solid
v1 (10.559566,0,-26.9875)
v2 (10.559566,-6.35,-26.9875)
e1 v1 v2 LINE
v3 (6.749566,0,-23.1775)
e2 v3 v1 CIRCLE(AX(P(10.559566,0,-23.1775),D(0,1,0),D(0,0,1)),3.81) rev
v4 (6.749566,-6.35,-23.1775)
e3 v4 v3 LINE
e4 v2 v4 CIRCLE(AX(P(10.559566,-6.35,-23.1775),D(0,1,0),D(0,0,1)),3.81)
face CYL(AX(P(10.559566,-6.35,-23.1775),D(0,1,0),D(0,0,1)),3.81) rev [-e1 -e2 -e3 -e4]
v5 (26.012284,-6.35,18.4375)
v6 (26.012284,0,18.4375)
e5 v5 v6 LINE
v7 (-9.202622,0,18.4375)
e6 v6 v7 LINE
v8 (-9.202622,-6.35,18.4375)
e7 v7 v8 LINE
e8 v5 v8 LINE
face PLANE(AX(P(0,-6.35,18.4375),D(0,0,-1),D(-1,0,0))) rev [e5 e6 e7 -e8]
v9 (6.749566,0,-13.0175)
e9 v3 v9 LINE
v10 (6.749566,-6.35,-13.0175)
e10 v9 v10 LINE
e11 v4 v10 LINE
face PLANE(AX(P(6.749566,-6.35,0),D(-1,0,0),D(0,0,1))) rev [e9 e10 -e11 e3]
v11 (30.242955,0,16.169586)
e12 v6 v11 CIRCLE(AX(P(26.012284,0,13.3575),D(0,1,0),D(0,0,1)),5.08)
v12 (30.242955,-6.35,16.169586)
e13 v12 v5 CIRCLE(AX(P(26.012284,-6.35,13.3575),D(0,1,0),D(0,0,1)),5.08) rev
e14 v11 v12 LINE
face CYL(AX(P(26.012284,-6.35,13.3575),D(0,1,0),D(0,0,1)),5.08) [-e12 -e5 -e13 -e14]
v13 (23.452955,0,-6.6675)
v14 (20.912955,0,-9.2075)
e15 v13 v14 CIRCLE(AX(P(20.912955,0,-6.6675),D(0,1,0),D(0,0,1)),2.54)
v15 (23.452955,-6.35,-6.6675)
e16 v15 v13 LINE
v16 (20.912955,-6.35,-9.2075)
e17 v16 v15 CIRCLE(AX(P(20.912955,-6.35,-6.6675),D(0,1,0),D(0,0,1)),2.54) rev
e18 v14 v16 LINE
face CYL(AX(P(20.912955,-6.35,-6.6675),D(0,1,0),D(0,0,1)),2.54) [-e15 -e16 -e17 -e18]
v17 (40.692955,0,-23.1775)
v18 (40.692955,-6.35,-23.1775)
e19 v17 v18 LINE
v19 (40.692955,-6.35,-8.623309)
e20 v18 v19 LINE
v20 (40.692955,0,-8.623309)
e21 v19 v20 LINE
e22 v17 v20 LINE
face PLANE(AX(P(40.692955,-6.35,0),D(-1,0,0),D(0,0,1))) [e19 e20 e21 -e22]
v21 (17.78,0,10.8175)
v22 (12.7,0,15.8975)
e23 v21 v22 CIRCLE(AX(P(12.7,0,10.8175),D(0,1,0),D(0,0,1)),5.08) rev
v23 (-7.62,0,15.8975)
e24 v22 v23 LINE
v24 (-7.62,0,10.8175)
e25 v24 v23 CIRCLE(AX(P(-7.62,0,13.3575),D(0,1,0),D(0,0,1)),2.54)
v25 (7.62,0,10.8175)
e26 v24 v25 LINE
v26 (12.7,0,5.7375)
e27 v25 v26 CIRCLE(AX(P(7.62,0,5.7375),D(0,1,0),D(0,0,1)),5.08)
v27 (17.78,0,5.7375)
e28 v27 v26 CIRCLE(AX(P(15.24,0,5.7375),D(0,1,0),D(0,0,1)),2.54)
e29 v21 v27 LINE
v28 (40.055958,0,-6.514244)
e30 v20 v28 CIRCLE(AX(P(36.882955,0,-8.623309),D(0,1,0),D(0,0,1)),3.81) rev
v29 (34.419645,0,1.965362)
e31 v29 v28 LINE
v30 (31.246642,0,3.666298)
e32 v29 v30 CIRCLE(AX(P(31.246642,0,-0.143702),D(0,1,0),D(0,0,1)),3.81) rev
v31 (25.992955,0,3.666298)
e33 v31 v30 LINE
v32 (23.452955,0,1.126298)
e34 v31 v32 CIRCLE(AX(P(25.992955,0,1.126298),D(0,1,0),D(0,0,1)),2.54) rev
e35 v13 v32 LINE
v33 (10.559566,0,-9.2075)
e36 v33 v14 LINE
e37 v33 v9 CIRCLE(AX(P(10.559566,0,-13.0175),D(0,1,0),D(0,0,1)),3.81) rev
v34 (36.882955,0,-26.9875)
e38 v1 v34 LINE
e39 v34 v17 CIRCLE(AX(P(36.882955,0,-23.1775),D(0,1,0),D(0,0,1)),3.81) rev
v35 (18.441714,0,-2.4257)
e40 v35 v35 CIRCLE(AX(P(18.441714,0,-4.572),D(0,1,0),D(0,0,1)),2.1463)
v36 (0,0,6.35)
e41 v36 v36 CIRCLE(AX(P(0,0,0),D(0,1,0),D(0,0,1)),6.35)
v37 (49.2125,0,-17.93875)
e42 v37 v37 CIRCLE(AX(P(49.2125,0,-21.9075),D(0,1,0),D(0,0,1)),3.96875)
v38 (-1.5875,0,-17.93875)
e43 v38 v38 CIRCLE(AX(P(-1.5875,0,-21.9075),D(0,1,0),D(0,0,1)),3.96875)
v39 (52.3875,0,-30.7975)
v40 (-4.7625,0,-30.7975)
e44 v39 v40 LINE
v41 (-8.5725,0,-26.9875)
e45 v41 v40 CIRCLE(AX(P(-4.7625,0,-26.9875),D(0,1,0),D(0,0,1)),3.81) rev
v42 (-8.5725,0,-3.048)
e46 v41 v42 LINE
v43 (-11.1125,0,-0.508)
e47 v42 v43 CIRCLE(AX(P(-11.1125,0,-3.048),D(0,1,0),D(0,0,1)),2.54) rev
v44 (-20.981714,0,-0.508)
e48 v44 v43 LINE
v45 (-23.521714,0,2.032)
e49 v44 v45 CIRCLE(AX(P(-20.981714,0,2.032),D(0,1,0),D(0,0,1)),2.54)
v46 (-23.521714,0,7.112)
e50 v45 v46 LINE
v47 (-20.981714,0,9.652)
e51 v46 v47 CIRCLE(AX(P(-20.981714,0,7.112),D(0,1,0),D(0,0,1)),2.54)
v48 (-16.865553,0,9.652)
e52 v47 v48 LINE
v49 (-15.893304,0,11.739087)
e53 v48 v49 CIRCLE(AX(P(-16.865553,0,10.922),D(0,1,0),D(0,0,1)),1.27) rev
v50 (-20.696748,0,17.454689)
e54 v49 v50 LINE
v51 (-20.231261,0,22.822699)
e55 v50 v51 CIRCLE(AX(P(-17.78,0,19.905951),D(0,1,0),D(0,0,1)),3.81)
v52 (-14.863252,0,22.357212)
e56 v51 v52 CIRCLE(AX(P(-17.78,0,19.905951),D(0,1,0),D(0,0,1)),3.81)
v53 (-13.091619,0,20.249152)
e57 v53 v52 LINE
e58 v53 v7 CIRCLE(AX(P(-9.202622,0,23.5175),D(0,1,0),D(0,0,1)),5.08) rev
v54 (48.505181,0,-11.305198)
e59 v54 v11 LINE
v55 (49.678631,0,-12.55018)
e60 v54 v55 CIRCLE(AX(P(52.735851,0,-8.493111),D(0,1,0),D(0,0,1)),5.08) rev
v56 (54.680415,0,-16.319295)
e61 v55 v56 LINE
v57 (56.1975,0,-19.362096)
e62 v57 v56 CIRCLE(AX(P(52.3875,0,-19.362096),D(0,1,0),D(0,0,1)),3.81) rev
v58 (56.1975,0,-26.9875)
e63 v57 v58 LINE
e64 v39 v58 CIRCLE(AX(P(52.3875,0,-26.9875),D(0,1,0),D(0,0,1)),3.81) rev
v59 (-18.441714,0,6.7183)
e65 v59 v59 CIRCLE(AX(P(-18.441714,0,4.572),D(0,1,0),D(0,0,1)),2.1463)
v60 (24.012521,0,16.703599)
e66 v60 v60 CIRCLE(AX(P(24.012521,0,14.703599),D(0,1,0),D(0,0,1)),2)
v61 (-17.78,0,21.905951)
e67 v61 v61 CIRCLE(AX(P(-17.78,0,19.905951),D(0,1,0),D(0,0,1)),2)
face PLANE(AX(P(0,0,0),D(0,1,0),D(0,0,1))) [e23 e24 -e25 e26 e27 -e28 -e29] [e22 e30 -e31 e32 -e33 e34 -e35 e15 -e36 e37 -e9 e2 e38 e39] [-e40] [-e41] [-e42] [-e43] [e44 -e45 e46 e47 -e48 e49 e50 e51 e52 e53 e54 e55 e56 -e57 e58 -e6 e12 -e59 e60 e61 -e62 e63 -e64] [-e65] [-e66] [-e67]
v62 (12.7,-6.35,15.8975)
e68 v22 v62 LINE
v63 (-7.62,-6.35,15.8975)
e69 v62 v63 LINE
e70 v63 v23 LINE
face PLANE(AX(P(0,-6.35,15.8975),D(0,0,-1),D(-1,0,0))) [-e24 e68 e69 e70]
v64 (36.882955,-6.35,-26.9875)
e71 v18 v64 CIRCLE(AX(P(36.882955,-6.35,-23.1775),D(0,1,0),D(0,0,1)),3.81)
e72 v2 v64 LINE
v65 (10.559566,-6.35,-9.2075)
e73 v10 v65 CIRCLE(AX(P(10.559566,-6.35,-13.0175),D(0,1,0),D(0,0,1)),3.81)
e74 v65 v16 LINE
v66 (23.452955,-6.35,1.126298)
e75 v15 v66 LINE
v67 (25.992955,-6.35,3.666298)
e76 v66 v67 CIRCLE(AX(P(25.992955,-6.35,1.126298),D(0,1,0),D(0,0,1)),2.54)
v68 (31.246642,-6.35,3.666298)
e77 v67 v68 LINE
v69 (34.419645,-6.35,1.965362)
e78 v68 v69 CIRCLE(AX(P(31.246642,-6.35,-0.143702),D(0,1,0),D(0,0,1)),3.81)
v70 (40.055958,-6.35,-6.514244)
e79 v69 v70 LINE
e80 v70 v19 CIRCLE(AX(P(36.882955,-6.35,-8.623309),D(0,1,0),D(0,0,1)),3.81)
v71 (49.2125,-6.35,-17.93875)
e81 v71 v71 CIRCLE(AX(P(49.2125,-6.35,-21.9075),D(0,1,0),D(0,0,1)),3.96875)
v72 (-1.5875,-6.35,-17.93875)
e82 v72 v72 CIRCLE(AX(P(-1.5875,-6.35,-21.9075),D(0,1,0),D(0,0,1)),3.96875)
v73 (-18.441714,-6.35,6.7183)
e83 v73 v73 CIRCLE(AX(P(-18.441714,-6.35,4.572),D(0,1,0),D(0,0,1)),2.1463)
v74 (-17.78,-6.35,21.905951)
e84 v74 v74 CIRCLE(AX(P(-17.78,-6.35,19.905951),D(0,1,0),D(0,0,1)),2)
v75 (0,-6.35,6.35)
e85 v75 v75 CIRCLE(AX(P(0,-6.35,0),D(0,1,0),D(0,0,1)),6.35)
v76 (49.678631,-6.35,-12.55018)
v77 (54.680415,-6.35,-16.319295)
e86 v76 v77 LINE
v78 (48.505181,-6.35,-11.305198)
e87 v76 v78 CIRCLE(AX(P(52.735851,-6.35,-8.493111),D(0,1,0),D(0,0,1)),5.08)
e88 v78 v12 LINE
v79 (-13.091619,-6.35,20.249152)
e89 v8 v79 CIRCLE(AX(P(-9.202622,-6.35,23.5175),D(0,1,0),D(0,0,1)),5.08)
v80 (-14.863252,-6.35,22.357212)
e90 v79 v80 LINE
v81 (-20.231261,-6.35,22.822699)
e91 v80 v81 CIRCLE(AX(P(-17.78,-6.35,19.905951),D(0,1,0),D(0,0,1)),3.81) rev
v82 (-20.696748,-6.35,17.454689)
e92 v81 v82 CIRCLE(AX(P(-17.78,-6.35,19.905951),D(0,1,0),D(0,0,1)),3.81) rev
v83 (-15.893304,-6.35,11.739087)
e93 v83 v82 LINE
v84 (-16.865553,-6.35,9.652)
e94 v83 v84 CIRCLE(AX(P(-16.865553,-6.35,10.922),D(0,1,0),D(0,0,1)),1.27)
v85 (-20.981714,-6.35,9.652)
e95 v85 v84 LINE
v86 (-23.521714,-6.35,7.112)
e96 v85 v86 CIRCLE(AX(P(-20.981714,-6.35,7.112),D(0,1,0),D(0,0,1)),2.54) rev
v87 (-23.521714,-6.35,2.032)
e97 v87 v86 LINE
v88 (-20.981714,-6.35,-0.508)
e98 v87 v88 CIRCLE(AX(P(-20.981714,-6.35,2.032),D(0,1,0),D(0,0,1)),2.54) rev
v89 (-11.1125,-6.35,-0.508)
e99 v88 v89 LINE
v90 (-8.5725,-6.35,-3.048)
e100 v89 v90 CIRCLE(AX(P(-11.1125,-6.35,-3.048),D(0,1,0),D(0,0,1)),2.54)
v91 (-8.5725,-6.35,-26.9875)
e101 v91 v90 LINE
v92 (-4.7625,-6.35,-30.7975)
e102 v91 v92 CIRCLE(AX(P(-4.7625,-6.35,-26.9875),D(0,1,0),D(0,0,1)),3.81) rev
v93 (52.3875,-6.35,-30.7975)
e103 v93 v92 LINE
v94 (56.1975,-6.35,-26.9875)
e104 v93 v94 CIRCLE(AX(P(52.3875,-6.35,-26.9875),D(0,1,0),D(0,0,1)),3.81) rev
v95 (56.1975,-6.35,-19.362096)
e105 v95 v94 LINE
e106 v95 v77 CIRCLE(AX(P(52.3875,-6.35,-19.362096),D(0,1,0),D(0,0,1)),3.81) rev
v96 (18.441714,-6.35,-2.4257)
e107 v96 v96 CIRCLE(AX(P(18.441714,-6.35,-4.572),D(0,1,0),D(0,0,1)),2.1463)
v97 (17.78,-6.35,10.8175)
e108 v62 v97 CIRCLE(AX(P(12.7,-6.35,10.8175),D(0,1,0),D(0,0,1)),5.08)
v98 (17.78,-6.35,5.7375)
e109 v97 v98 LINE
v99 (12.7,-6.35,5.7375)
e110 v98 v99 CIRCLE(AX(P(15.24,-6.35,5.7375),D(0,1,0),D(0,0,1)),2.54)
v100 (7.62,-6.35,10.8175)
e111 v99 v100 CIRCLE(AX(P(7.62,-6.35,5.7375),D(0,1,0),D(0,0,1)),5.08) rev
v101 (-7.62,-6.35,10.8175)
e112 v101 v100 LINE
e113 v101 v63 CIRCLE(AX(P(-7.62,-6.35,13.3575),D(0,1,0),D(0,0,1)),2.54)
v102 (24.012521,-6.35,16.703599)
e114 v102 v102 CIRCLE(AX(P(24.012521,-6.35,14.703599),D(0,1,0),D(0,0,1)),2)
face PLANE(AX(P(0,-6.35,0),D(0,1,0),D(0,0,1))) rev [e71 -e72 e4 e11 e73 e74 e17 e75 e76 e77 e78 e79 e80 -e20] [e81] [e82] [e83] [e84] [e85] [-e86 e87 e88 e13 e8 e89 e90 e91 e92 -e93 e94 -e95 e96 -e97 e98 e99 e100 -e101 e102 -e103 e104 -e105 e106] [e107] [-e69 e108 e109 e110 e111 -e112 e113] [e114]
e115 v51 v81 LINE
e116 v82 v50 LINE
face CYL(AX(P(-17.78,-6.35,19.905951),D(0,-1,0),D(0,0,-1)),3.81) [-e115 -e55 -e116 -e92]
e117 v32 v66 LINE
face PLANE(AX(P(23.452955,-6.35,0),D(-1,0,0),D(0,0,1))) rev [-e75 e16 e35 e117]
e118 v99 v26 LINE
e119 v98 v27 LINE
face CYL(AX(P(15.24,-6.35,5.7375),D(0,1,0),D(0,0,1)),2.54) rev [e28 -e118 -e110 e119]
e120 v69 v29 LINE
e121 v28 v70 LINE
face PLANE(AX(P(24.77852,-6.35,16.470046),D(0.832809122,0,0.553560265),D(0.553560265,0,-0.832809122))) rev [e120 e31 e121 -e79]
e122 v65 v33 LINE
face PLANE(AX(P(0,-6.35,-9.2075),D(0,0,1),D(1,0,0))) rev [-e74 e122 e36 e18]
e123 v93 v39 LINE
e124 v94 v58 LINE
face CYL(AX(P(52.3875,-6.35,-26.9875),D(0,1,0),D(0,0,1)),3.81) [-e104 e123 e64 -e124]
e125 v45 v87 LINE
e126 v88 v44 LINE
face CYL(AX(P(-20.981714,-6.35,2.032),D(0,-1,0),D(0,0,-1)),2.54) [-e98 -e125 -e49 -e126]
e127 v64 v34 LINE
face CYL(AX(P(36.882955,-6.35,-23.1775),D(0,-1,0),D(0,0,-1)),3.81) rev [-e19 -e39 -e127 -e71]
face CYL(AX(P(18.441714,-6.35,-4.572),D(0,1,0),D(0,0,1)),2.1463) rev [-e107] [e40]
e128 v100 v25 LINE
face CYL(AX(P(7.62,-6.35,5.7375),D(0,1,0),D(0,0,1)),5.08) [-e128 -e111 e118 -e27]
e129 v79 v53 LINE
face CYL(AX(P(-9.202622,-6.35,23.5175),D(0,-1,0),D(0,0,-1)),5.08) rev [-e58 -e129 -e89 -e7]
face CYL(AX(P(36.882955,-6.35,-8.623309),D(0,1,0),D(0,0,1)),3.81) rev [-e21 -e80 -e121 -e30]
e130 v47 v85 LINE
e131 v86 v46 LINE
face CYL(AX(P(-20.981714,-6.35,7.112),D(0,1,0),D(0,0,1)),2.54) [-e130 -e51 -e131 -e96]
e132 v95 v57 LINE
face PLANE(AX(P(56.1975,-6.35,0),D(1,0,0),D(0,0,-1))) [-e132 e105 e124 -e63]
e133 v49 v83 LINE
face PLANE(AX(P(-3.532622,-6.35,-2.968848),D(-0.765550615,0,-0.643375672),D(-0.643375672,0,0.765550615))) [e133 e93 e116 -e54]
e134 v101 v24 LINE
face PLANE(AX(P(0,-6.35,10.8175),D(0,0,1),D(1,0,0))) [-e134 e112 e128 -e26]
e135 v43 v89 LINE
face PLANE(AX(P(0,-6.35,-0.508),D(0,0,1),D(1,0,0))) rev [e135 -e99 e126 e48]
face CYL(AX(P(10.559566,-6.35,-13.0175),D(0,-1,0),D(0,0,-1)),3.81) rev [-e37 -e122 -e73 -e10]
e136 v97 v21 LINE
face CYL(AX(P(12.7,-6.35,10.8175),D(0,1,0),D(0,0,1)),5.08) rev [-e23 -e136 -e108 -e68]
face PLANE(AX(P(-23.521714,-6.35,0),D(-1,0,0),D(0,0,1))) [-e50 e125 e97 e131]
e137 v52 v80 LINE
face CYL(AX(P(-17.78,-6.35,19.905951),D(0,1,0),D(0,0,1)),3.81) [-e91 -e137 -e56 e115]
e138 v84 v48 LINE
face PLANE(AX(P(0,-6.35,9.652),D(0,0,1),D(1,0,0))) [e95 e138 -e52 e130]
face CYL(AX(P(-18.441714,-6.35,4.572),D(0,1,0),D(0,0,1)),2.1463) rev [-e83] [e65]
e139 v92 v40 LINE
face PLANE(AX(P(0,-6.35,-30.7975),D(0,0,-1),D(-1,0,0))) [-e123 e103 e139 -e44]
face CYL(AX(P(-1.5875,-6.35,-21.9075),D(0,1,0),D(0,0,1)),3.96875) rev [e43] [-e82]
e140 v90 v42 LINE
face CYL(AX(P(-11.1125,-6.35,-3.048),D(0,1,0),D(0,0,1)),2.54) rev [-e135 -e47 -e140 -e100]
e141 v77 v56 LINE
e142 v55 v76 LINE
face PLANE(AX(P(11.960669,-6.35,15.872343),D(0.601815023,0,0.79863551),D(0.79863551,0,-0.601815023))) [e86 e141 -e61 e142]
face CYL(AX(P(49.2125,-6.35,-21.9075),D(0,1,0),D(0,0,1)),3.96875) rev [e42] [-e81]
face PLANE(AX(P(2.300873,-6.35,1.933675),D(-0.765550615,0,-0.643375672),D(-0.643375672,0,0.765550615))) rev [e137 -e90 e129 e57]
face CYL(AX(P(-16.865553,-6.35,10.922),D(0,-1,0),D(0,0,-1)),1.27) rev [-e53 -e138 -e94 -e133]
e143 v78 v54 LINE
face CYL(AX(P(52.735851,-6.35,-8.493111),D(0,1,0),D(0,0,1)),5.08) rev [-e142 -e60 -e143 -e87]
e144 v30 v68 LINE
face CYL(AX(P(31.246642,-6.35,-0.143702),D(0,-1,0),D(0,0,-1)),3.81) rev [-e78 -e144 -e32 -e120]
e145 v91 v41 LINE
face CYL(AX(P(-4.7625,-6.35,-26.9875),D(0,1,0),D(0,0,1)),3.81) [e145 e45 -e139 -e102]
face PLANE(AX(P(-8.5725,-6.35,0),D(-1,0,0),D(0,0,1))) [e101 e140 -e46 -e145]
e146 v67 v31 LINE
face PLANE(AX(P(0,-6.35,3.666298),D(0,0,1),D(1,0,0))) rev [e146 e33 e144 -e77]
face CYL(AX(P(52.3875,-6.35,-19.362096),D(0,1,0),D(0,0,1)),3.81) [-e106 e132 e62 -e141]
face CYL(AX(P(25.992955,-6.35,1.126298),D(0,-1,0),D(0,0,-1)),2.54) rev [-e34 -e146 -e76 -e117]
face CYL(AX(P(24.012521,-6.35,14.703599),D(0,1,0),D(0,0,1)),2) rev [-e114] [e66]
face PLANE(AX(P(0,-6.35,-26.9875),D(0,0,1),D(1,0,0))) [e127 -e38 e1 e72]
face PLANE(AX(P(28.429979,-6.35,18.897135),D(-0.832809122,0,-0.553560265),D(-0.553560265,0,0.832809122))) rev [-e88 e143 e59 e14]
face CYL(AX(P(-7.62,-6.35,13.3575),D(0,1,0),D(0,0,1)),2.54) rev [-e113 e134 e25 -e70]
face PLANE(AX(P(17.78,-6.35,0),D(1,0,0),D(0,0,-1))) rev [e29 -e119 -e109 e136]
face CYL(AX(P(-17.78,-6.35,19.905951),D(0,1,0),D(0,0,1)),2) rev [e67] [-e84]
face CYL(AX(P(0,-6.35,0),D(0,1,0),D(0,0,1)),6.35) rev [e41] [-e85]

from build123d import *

# Parameters (mm, degrees)
SKETCH4_R           = 2
SKETCH4_R_2         = 3.96875
BOSS_EXTRUDE2_DEPTH = 6.35
FILLET1_R           = 5.08
FILLET7_R           = 3.81
FILLET9_R           = 5.08
FILLET10_R          = 1.27
FILLET11_R          = 3.81
FILLET12_R          = 2.54
FILLET13_R          = 3.81


with BuildPart() as part:
    # Sketch4 → Boss-Extrude2 (new body)
    with BuildSketch(Plane(origin=(0, 0, 0), x_dir=(1, 0, 0), z_dir=(0, 1, 0))):
        with BuildLine():
            Line((22.483900583, -18.4375), (28.735494078, -18.4375))
            Line((28.735494078, -18.4375), (48.985566477, 12.027918285))
            Line((48.985566477, 12.027918285), (54.680415238, 16.319294633))
            ThreePointArc((54.680415238, 16.319294633), (55.797199918, 17.662082259), (56.1975, 19.362095927))
            Line((56.1975, 19.362095927), (56.1975, 26.9875))
            ThreePointArc((56.1975, 26.9875), (55.081576836, 29.681576836), (52.3875, 30.7975))
            Line((52.3875, 30.7975), (-4.7625, 30.7975))
            ThreePointArc((-4.7625, 30.7975), (-7.456576836, 29.681576836), (-8.5725, 26.9875))
            Line((-8.5725, 26.9875), (-8.5725, 12.607500122))
            Line((-8.5725, 12.607500122), (-8.5725, 0.508))
            Line((-8.5725, 0.508), (-23.52171402, 0.508))
            Line((-23.52171402, 0.508), (-23.52171402, -9.652))
            Line((-23.52171402, -9.652), (-14.139296969, -9.652))
            Line((-14.139296969, -9.652), (-23.148009155, -20.371437257))
            Line((-23.148009155, -20.371437257), (-17.314513469, -25.273959881))
            Line((-17.314513469, -25.273959881), (-11.569090649, -18.4375))
            Line((-11.569090649, -18.4375), (22.483900583, -18.4375))
        make_face()
        with Locations(Location((-17.78, -19.905950726, 0), (0, 0, 270))):
            Circle(SKETCH4_R, mode=Mode.SUBTRACT)
        with BuildLine():
            ThreePointArc((-16.29541402, -4.572), (-20.572189245, -4.832151892), (-16.358479767, -4.055532442))
            ThreePointArc((-16.358479767, -4.055532442), (-16.311238795, -4.311848108), (-16.29541402, -4.572))
        make_face(mode=Mode.SUBTRACT)
        with BuildLine():
            ThreePointArc((-7.62, -15.8975), (-10.16, -13.3575), (-7.62, -10.8175))
            Line((-7.62, -10.8175), (12.7, -10.8175))
            Line((12.7, -10.8175), (12.7, -5.7375))
            ThreePointArc((12.7, -5.7375), (15.24, -3.1975), (17.78, -5.7375))
            Line((17.78, -5.7375), (17.78, -13.3575))
            Line((17.78, -13.3575), (17.78, -15.8975))
            Line((17.78, -15.8975), (15.24, -15.8975))
            Line((15.24, -15.8975), (-7.62, -15.8975))
        make_face(mode=Mode.SUBTRACT)
        with BuildLine():
            ThreePointArc((-6.163414949, -1.528010526), (-1.528010526, 6.163414949), (6.163414949, 1.528010526))
            ThreePointArc((6.163414949, 1.528010526), (6.303181138, 0.769680153), (6.35, 0))
            ThreePointArc((6.35, 0), (0.769680153, -6.303181138), (-6.163414949, -1.528010526))
        make_face(mode=Mode.SUBTRACT)
        with Locations(Location((24.012521227, -14.703599027, 0), (0, 0, 270))):
            Circle(SKETCH4_R, mode=Mode.SUBTRACT)
        with Locations(Location((-1.5875, 21.9075, 0), (0, 0, 270))):
            Circle(SKETCH4_R_2, mode=Mode.SUBTRACT)
        with BuildLine():
            ThreePointArc((20.58801402, 4.572), (18.701865912, 2.441524775), (16.358479767, 4.055532442))
            ThreePointArc((16.358479767, 4.055532442), (18.181562129, 6.702475225), (20.58801402, 4.572))
        make_face(mode=Mode.SUBTRACT)
        Polygon((6.749565973, 9.2075), (6.749565973, 26.9875), (40.692955064, 26.9875), (40.692955064, 7.472580753), (33.28904903, -3.666297657), (23.452955064, -3.666297657), (23.452955064, 9.2075), align=None, mode=Mode.SUBTRACT)
        with Locations(Location((49.2125, 21.9075, 0), (0, 0, 270))):
            Circle(SKETCH4_R_2, mode=Mode.SUBTRACT)
    extrude(amount=-BOSS_EXTRUDE2_DEPTH)

    # Fillet1
    fillet1_edges = [part.edges().sort_by_distance(p)[0] for p in [
        (48.985566477, -3.175, -12.027918285),
        (28.735494078, -3.175, 18.4375),
    ]]
    fillet(fillet1_edges, radius=FILLET1_R)

    # Fillet7
    fillet7_edges = [part.edges().sort_by_distance(p)[0] for p in [
        (40.692955064, -3.175, -7.472580753),
        (40.692955064, -3.175, -26.9875),
        (6.749565973, -3.175, -26.9875),
        (6.749565973, -3.175, -9.2075),
    ]]
    fillet(fillet7_edges, radius=FILLET7_R)

    # Fillet9
    fillet9_edges = [part.edges().sort_by_distance(p)[0] for p in [
        (-11.569090649, -3.175, 18.4375),
        (12.7, -3.175, 10.8175),
        (17.78, -3.175, 15.8975),
    ]]
    fillet(fillet9_edges, radius=FILLET9_R - 0.0001)  # a hair under: the kernel refuses the full size

    # Fillet10
    fillet10_edges = [part.edges().sort_by_distance(p)[0] for p in [
        (-14.139296969, -3.175, 9.652),
    ]]
    fillet(fillet10_edges, radius=FILLET10_R)

    # Fillet11
    fillet11_edges = [part.edges().sort_by_distance(p)[0] for p in [
        (-17.314513469, -3.175, 25.273959881),
        (-23.148009155, -3.175, 20.371437257),
    ]]
    fillet(fillet11_edges, radius=FILLET11_R - 0.0001)  # a hair under: the kernel refuses the full size

    # Fillet12
    fillet12_edges = [part.edges().sort_by_distance(p)[0] for p in [
        (23.452955064, -3.175, -9.2075),
        (23.452955064, -3.175, 3.666297657),
        (-23.52171402, -3.175, 9.652),
        (-23.52171402, -3.175, -0.508),
        (-8.5725, -3.175, -0.508),
    ]]
    fillet(fillet12_edges, radius=FILLET12_R)

    # Fillet13
    fillet13_edges = [part.edges().sort_by_distance(p)[0] for p in [
        (33.28904903, -3.175, 3.666297657),
    ]]
    fillet(fillet13_edges, radius=FILLET13_R)


solid = part.part
